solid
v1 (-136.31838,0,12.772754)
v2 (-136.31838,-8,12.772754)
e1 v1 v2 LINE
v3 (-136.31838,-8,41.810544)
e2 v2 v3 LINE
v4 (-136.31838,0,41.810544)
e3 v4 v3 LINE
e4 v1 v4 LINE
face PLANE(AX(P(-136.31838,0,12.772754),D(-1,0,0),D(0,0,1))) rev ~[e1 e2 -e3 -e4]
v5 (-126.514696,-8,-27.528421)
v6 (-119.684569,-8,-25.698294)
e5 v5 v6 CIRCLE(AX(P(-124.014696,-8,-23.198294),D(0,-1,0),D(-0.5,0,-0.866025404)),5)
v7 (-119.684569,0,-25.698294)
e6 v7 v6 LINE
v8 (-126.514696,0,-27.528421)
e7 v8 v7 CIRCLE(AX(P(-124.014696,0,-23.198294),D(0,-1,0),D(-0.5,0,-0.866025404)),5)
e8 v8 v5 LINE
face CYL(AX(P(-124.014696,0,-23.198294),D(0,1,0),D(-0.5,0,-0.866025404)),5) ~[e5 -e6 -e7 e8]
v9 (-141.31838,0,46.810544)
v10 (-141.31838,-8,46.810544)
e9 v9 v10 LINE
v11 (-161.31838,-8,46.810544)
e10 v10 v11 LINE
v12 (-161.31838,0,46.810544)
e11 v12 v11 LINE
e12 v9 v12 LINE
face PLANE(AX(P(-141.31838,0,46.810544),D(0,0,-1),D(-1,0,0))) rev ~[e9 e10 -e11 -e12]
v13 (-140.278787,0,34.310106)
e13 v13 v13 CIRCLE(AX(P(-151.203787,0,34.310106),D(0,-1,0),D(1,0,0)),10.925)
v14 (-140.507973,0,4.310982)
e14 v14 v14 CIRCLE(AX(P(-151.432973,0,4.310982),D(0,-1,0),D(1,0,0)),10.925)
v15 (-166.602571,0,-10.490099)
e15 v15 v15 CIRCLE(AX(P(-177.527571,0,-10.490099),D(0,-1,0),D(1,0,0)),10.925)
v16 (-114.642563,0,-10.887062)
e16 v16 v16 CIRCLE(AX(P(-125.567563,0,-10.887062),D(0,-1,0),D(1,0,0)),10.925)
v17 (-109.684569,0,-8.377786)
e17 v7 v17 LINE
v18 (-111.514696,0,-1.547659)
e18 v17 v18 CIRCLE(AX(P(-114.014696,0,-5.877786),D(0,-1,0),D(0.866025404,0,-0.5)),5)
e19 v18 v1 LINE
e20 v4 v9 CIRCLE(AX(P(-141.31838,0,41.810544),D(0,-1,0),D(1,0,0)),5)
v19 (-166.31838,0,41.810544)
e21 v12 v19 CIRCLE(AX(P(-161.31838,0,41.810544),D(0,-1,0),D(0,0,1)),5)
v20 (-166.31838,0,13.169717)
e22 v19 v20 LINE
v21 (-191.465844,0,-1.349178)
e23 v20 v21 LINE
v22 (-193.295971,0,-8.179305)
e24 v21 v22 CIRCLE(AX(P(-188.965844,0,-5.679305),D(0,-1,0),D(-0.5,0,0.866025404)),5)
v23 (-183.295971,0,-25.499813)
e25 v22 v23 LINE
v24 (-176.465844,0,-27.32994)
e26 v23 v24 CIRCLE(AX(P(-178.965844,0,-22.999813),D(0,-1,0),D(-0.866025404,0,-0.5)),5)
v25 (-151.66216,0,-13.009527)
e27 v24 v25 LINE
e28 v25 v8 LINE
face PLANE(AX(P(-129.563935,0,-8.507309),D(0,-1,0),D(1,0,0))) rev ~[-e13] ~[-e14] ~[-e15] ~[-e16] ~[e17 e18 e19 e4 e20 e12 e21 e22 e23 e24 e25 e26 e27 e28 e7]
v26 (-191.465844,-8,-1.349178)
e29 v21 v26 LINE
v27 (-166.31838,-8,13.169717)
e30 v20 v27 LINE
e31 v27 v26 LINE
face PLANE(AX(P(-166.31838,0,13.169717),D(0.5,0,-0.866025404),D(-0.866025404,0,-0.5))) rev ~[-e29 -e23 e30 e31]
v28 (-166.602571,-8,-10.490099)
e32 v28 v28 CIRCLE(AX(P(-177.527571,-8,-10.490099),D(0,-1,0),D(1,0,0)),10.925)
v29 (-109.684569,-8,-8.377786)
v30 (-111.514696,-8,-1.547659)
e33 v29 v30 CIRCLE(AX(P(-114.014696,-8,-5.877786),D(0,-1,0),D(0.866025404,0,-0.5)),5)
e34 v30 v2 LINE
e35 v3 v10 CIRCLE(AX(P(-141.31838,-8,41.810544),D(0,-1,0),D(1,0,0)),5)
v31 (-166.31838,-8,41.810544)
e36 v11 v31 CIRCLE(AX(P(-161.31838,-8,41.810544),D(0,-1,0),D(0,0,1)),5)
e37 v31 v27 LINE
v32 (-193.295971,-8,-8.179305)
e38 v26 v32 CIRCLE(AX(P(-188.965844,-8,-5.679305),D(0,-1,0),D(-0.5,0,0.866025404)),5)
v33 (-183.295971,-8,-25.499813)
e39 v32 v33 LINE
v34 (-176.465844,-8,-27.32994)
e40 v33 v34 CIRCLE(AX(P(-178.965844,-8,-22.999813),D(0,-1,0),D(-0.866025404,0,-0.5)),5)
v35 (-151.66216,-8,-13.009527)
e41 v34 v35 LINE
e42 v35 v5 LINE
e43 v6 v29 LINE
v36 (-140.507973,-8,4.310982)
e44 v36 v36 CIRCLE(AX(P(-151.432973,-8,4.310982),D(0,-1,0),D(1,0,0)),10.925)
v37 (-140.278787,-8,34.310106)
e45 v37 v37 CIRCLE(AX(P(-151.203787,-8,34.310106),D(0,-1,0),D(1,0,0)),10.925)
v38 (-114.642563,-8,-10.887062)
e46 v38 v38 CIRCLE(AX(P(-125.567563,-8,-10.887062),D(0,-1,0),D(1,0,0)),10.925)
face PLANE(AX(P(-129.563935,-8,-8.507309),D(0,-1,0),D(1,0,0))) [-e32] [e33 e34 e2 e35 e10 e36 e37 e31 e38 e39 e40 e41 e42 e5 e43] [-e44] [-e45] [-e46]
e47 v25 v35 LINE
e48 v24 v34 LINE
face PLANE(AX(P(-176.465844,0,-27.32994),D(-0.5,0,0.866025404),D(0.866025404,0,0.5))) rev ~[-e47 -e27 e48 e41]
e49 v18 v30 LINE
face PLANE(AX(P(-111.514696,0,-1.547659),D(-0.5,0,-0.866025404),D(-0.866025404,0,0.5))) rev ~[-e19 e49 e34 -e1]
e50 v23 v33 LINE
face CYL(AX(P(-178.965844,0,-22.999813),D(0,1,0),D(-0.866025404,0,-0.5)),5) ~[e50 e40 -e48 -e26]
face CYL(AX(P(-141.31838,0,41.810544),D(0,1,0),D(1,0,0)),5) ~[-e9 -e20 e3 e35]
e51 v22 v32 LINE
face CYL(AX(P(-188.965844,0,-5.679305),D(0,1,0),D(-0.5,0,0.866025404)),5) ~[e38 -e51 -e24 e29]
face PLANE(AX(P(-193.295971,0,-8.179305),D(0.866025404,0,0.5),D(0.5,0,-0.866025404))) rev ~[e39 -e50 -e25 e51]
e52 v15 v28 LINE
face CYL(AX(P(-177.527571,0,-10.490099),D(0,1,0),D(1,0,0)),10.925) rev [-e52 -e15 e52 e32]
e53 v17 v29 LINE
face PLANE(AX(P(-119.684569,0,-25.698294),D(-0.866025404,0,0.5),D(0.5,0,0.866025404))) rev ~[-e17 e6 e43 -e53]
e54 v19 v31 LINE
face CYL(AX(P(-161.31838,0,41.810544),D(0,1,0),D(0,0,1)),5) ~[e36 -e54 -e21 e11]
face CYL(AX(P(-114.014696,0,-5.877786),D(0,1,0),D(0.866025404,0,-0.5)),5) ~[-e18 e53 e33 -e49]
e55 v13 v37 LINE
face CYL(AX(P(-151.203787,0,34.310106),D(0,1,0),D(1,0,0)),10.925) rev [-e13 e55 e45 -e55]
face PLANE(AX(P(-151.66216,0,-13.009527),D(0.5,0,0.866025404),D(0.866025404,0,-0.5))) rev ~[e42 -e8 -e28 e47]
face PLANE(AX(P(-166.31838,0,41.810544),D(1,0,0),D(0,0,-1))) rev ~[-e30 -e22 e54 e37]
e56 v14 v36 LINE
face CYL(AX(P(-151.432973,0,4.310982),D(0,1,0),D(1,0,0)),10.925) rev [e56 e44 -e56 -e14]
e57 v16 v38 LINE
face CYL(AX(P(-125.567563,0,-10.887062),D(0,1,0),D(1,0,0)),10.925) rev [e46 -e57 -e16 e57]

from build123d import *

# Parameters (mm, degrees)
F0_R     = 10.925
F1_DEPTH = 8


with BuildPart() as f1:
    # F0 (on Front) → F1 (new body)
    with BuildSketch(Plane.XZ):
        with BuildLine():
            Line((-136.3183801476, -4.150791151), (-136.3183801476, -8.1894561753))
            Line((-136.3183801476, -8.1894561753), (-143.3135531644, -8.1894561753))
            Line((-143.3135531644, -8.1894561753), (-151.6621599046, -13.0095265241))
            Line((-151.6621599046, -13.0095265241), (-126.5146964668, -27.5284213094))
            ThreePointArc((-126.5146964668, -27.5284213094), (-122.7206012413, -28.027923422), (-119.6845694479, -25.6982942905))
            Line((-119.6845694479, -25.6982942905), (-109.6845694479, -8.3777862148))
            ThreePointArc((-109.6845694479, -8.3777862148), (-109.1850673353, -4.5836909893), (-111.5146964668, -1.5476591959))
            Line((-111.5146964668, -1.5476591959), (-136.3183801476, 12.7727542541))
            Line((-136.3183801476, 12.7727542541), (-136.3183801476, 3.1326135564))
            Line((-136.3183801476, 3.1326135564), (-133.1645733963, -2.3299399742))
            Line((-133.1645733963, -2.3299399742), (-136.3183801476, -4.150791151))
        make_face()
        with Locations((-125.5675627039, -10.8870620569)):
            Circle(F0_R, mode=Mode.SUBTRACT)
        Polygon((-144.6669868879, 17.592824603), (-136.3183801476, 3.1326135564), (-136.3183801476, 12.7727542541), align=None)
        Polygon((-157.9697734074, 17.9897872735), (-151.6621599046, 21.6314896272), (-154.815966656, 23.4523408041), align=None)
        with BuildLine():
            Line((-144.6669868879, 17.592824603), (-136.3183801476, 12.7727542541))
            Line((-136.3183801476, 12.7727542541), (-136.3183801476, 41.8105438247))
            ThreePointArc((-136.3183801476, 41.8105438247), (-137.7828462417, 45.3460777306), (-141.3183801476, 46.8105438247))
            Line((-141.3183801476, 46.8105438247), (-161.3183801476, 46.8105438247))
            ThreePointArc((-161.3183801476, 46.8105438247), (-164.8539140536, 45.3460777306), (-166.3183801476, 41.8105438247))
            Line((-166.3183801476, 41.8105438247), (-166.3183801476, 13.1697169246))
            Line((-166.3183801476, 13.1697169246), (-157.9697734074, 17.9897872735))
            Line((-157.9697734074, 17.9897872735), (-154.815966656, 23.4523408041))
            Line((-154.815966656, 23.4523408041), (-151.6621599046, 21.6314896272))
            Line((-151.6621599046, 21.6314896272), (-148.1645733963, 23.6508221394))
            Line((-148.1645733963, 23.6508221394), (-144.6669868879, 17.592824603))
        make_face()
        with Locations((-151.2037868953, 34.3101060979)):
            Circle(F0_R, mode=Mode.SUBTRACT)
        Polygon((-166.3183801476, 13.1697169246), (-166.3183801476, 3.5295762269), (-157.9697734074, 17.9897872735), align=None)
        with BuildLine():
            Line((-151.6621599046, -13.0095265241), (-160.0107666449, -8.1894561753))
            Line((-160.0107666449, -8.1894561753), (-166.3183801476, -8.1894561753))
            Line((-166.3183801476, -8.1894561753), (-166.3183801476, -4.5477538216))
            Line((-166.3183801476, -4.5477538216), (-169.815966656, -2.5284213094))
            Line((-169.815966656, -2.5284213094), (-166.3183801476, 3.5295762269))
            Line((-166.3183801476, 3.5295762269), (-166.3183801476, 13.1697169246))
            Line((-166.3183801476, 13.1697169246), (-191.4658435855, -1.3491778606))
            ThreePointArc((-191.4658435855, -1.3491778606), (-193.7954727169, -4.3852096541), (-193.2959706044, -8.1793048796))
            Line((-193.2959706044, -8.1793048796), (-183.2959706044, -25.4998129553))
            ThreePointArc((-183.2959706044, -25.4998129553), (-180.259938811, -27.8294420867), (-176.4658435855, -27.3299399742))
            Line((-176.4658435855, -27.3299399742), (-151.6621599046, -13.0095265241))
        make_face()
        with Locations((-177.5275706007, -10.4900993864)):
            Circle(F0_R, mode=Mode.SUBTRACT)
        Polygon((-160.0107666449, -8.1894561753), (-143.3135531644, -8.1894561753), (-136.3183801476, -4.150791151), (-136.3183801476, 3.1326135564), (-144.6669868879, 17.592824603), (-151.6621599046, 21.6314896272), (-157.9697734074, 17.9897872735), (-166.3183801476, 3.5295762269), (-166.3183801476, -4.5477538216), align=None)
        with Locations((-151.4329734, 4.3109815515)):
            Circle(F0_R, mode=Mode.SUBTRACT)
        Polygon((-169.815966656, -2.5284213094), (-166.3183801476, -4.5477538216), (-166.3183801476, 3.5295762269), align=None)
        Polygon((-151.6621599046, 21.6314896272), (-144.6669868879, 17.592824603), (-148.1645733963, 23.6508221394), align=None)
        Polygon((-136.3183801476, 3.1326135564), (-136.3183801476, -4.150791151), (-133.1645733963, -2.3299399742), align=None)
        Polygon((-143.3135531644, -8.1894561753), (-136.3183801476, -8.1894561753), (-136.3183801476, -4.150791151), align=None)
        Polygon((-166.3183801476, -8.1894561753), (-160.0107666449, -8.1894561753), (-166.3183801476, -4.5477538216), align=None)
        Polygon((-151.6621599046, -13.0095265241), (-143.3135531644, -8.1894561753), (-160.0107666449, -8.1894561753), align=None)
    extrude(amount=F1_DEPTH)


solid = f1.part
